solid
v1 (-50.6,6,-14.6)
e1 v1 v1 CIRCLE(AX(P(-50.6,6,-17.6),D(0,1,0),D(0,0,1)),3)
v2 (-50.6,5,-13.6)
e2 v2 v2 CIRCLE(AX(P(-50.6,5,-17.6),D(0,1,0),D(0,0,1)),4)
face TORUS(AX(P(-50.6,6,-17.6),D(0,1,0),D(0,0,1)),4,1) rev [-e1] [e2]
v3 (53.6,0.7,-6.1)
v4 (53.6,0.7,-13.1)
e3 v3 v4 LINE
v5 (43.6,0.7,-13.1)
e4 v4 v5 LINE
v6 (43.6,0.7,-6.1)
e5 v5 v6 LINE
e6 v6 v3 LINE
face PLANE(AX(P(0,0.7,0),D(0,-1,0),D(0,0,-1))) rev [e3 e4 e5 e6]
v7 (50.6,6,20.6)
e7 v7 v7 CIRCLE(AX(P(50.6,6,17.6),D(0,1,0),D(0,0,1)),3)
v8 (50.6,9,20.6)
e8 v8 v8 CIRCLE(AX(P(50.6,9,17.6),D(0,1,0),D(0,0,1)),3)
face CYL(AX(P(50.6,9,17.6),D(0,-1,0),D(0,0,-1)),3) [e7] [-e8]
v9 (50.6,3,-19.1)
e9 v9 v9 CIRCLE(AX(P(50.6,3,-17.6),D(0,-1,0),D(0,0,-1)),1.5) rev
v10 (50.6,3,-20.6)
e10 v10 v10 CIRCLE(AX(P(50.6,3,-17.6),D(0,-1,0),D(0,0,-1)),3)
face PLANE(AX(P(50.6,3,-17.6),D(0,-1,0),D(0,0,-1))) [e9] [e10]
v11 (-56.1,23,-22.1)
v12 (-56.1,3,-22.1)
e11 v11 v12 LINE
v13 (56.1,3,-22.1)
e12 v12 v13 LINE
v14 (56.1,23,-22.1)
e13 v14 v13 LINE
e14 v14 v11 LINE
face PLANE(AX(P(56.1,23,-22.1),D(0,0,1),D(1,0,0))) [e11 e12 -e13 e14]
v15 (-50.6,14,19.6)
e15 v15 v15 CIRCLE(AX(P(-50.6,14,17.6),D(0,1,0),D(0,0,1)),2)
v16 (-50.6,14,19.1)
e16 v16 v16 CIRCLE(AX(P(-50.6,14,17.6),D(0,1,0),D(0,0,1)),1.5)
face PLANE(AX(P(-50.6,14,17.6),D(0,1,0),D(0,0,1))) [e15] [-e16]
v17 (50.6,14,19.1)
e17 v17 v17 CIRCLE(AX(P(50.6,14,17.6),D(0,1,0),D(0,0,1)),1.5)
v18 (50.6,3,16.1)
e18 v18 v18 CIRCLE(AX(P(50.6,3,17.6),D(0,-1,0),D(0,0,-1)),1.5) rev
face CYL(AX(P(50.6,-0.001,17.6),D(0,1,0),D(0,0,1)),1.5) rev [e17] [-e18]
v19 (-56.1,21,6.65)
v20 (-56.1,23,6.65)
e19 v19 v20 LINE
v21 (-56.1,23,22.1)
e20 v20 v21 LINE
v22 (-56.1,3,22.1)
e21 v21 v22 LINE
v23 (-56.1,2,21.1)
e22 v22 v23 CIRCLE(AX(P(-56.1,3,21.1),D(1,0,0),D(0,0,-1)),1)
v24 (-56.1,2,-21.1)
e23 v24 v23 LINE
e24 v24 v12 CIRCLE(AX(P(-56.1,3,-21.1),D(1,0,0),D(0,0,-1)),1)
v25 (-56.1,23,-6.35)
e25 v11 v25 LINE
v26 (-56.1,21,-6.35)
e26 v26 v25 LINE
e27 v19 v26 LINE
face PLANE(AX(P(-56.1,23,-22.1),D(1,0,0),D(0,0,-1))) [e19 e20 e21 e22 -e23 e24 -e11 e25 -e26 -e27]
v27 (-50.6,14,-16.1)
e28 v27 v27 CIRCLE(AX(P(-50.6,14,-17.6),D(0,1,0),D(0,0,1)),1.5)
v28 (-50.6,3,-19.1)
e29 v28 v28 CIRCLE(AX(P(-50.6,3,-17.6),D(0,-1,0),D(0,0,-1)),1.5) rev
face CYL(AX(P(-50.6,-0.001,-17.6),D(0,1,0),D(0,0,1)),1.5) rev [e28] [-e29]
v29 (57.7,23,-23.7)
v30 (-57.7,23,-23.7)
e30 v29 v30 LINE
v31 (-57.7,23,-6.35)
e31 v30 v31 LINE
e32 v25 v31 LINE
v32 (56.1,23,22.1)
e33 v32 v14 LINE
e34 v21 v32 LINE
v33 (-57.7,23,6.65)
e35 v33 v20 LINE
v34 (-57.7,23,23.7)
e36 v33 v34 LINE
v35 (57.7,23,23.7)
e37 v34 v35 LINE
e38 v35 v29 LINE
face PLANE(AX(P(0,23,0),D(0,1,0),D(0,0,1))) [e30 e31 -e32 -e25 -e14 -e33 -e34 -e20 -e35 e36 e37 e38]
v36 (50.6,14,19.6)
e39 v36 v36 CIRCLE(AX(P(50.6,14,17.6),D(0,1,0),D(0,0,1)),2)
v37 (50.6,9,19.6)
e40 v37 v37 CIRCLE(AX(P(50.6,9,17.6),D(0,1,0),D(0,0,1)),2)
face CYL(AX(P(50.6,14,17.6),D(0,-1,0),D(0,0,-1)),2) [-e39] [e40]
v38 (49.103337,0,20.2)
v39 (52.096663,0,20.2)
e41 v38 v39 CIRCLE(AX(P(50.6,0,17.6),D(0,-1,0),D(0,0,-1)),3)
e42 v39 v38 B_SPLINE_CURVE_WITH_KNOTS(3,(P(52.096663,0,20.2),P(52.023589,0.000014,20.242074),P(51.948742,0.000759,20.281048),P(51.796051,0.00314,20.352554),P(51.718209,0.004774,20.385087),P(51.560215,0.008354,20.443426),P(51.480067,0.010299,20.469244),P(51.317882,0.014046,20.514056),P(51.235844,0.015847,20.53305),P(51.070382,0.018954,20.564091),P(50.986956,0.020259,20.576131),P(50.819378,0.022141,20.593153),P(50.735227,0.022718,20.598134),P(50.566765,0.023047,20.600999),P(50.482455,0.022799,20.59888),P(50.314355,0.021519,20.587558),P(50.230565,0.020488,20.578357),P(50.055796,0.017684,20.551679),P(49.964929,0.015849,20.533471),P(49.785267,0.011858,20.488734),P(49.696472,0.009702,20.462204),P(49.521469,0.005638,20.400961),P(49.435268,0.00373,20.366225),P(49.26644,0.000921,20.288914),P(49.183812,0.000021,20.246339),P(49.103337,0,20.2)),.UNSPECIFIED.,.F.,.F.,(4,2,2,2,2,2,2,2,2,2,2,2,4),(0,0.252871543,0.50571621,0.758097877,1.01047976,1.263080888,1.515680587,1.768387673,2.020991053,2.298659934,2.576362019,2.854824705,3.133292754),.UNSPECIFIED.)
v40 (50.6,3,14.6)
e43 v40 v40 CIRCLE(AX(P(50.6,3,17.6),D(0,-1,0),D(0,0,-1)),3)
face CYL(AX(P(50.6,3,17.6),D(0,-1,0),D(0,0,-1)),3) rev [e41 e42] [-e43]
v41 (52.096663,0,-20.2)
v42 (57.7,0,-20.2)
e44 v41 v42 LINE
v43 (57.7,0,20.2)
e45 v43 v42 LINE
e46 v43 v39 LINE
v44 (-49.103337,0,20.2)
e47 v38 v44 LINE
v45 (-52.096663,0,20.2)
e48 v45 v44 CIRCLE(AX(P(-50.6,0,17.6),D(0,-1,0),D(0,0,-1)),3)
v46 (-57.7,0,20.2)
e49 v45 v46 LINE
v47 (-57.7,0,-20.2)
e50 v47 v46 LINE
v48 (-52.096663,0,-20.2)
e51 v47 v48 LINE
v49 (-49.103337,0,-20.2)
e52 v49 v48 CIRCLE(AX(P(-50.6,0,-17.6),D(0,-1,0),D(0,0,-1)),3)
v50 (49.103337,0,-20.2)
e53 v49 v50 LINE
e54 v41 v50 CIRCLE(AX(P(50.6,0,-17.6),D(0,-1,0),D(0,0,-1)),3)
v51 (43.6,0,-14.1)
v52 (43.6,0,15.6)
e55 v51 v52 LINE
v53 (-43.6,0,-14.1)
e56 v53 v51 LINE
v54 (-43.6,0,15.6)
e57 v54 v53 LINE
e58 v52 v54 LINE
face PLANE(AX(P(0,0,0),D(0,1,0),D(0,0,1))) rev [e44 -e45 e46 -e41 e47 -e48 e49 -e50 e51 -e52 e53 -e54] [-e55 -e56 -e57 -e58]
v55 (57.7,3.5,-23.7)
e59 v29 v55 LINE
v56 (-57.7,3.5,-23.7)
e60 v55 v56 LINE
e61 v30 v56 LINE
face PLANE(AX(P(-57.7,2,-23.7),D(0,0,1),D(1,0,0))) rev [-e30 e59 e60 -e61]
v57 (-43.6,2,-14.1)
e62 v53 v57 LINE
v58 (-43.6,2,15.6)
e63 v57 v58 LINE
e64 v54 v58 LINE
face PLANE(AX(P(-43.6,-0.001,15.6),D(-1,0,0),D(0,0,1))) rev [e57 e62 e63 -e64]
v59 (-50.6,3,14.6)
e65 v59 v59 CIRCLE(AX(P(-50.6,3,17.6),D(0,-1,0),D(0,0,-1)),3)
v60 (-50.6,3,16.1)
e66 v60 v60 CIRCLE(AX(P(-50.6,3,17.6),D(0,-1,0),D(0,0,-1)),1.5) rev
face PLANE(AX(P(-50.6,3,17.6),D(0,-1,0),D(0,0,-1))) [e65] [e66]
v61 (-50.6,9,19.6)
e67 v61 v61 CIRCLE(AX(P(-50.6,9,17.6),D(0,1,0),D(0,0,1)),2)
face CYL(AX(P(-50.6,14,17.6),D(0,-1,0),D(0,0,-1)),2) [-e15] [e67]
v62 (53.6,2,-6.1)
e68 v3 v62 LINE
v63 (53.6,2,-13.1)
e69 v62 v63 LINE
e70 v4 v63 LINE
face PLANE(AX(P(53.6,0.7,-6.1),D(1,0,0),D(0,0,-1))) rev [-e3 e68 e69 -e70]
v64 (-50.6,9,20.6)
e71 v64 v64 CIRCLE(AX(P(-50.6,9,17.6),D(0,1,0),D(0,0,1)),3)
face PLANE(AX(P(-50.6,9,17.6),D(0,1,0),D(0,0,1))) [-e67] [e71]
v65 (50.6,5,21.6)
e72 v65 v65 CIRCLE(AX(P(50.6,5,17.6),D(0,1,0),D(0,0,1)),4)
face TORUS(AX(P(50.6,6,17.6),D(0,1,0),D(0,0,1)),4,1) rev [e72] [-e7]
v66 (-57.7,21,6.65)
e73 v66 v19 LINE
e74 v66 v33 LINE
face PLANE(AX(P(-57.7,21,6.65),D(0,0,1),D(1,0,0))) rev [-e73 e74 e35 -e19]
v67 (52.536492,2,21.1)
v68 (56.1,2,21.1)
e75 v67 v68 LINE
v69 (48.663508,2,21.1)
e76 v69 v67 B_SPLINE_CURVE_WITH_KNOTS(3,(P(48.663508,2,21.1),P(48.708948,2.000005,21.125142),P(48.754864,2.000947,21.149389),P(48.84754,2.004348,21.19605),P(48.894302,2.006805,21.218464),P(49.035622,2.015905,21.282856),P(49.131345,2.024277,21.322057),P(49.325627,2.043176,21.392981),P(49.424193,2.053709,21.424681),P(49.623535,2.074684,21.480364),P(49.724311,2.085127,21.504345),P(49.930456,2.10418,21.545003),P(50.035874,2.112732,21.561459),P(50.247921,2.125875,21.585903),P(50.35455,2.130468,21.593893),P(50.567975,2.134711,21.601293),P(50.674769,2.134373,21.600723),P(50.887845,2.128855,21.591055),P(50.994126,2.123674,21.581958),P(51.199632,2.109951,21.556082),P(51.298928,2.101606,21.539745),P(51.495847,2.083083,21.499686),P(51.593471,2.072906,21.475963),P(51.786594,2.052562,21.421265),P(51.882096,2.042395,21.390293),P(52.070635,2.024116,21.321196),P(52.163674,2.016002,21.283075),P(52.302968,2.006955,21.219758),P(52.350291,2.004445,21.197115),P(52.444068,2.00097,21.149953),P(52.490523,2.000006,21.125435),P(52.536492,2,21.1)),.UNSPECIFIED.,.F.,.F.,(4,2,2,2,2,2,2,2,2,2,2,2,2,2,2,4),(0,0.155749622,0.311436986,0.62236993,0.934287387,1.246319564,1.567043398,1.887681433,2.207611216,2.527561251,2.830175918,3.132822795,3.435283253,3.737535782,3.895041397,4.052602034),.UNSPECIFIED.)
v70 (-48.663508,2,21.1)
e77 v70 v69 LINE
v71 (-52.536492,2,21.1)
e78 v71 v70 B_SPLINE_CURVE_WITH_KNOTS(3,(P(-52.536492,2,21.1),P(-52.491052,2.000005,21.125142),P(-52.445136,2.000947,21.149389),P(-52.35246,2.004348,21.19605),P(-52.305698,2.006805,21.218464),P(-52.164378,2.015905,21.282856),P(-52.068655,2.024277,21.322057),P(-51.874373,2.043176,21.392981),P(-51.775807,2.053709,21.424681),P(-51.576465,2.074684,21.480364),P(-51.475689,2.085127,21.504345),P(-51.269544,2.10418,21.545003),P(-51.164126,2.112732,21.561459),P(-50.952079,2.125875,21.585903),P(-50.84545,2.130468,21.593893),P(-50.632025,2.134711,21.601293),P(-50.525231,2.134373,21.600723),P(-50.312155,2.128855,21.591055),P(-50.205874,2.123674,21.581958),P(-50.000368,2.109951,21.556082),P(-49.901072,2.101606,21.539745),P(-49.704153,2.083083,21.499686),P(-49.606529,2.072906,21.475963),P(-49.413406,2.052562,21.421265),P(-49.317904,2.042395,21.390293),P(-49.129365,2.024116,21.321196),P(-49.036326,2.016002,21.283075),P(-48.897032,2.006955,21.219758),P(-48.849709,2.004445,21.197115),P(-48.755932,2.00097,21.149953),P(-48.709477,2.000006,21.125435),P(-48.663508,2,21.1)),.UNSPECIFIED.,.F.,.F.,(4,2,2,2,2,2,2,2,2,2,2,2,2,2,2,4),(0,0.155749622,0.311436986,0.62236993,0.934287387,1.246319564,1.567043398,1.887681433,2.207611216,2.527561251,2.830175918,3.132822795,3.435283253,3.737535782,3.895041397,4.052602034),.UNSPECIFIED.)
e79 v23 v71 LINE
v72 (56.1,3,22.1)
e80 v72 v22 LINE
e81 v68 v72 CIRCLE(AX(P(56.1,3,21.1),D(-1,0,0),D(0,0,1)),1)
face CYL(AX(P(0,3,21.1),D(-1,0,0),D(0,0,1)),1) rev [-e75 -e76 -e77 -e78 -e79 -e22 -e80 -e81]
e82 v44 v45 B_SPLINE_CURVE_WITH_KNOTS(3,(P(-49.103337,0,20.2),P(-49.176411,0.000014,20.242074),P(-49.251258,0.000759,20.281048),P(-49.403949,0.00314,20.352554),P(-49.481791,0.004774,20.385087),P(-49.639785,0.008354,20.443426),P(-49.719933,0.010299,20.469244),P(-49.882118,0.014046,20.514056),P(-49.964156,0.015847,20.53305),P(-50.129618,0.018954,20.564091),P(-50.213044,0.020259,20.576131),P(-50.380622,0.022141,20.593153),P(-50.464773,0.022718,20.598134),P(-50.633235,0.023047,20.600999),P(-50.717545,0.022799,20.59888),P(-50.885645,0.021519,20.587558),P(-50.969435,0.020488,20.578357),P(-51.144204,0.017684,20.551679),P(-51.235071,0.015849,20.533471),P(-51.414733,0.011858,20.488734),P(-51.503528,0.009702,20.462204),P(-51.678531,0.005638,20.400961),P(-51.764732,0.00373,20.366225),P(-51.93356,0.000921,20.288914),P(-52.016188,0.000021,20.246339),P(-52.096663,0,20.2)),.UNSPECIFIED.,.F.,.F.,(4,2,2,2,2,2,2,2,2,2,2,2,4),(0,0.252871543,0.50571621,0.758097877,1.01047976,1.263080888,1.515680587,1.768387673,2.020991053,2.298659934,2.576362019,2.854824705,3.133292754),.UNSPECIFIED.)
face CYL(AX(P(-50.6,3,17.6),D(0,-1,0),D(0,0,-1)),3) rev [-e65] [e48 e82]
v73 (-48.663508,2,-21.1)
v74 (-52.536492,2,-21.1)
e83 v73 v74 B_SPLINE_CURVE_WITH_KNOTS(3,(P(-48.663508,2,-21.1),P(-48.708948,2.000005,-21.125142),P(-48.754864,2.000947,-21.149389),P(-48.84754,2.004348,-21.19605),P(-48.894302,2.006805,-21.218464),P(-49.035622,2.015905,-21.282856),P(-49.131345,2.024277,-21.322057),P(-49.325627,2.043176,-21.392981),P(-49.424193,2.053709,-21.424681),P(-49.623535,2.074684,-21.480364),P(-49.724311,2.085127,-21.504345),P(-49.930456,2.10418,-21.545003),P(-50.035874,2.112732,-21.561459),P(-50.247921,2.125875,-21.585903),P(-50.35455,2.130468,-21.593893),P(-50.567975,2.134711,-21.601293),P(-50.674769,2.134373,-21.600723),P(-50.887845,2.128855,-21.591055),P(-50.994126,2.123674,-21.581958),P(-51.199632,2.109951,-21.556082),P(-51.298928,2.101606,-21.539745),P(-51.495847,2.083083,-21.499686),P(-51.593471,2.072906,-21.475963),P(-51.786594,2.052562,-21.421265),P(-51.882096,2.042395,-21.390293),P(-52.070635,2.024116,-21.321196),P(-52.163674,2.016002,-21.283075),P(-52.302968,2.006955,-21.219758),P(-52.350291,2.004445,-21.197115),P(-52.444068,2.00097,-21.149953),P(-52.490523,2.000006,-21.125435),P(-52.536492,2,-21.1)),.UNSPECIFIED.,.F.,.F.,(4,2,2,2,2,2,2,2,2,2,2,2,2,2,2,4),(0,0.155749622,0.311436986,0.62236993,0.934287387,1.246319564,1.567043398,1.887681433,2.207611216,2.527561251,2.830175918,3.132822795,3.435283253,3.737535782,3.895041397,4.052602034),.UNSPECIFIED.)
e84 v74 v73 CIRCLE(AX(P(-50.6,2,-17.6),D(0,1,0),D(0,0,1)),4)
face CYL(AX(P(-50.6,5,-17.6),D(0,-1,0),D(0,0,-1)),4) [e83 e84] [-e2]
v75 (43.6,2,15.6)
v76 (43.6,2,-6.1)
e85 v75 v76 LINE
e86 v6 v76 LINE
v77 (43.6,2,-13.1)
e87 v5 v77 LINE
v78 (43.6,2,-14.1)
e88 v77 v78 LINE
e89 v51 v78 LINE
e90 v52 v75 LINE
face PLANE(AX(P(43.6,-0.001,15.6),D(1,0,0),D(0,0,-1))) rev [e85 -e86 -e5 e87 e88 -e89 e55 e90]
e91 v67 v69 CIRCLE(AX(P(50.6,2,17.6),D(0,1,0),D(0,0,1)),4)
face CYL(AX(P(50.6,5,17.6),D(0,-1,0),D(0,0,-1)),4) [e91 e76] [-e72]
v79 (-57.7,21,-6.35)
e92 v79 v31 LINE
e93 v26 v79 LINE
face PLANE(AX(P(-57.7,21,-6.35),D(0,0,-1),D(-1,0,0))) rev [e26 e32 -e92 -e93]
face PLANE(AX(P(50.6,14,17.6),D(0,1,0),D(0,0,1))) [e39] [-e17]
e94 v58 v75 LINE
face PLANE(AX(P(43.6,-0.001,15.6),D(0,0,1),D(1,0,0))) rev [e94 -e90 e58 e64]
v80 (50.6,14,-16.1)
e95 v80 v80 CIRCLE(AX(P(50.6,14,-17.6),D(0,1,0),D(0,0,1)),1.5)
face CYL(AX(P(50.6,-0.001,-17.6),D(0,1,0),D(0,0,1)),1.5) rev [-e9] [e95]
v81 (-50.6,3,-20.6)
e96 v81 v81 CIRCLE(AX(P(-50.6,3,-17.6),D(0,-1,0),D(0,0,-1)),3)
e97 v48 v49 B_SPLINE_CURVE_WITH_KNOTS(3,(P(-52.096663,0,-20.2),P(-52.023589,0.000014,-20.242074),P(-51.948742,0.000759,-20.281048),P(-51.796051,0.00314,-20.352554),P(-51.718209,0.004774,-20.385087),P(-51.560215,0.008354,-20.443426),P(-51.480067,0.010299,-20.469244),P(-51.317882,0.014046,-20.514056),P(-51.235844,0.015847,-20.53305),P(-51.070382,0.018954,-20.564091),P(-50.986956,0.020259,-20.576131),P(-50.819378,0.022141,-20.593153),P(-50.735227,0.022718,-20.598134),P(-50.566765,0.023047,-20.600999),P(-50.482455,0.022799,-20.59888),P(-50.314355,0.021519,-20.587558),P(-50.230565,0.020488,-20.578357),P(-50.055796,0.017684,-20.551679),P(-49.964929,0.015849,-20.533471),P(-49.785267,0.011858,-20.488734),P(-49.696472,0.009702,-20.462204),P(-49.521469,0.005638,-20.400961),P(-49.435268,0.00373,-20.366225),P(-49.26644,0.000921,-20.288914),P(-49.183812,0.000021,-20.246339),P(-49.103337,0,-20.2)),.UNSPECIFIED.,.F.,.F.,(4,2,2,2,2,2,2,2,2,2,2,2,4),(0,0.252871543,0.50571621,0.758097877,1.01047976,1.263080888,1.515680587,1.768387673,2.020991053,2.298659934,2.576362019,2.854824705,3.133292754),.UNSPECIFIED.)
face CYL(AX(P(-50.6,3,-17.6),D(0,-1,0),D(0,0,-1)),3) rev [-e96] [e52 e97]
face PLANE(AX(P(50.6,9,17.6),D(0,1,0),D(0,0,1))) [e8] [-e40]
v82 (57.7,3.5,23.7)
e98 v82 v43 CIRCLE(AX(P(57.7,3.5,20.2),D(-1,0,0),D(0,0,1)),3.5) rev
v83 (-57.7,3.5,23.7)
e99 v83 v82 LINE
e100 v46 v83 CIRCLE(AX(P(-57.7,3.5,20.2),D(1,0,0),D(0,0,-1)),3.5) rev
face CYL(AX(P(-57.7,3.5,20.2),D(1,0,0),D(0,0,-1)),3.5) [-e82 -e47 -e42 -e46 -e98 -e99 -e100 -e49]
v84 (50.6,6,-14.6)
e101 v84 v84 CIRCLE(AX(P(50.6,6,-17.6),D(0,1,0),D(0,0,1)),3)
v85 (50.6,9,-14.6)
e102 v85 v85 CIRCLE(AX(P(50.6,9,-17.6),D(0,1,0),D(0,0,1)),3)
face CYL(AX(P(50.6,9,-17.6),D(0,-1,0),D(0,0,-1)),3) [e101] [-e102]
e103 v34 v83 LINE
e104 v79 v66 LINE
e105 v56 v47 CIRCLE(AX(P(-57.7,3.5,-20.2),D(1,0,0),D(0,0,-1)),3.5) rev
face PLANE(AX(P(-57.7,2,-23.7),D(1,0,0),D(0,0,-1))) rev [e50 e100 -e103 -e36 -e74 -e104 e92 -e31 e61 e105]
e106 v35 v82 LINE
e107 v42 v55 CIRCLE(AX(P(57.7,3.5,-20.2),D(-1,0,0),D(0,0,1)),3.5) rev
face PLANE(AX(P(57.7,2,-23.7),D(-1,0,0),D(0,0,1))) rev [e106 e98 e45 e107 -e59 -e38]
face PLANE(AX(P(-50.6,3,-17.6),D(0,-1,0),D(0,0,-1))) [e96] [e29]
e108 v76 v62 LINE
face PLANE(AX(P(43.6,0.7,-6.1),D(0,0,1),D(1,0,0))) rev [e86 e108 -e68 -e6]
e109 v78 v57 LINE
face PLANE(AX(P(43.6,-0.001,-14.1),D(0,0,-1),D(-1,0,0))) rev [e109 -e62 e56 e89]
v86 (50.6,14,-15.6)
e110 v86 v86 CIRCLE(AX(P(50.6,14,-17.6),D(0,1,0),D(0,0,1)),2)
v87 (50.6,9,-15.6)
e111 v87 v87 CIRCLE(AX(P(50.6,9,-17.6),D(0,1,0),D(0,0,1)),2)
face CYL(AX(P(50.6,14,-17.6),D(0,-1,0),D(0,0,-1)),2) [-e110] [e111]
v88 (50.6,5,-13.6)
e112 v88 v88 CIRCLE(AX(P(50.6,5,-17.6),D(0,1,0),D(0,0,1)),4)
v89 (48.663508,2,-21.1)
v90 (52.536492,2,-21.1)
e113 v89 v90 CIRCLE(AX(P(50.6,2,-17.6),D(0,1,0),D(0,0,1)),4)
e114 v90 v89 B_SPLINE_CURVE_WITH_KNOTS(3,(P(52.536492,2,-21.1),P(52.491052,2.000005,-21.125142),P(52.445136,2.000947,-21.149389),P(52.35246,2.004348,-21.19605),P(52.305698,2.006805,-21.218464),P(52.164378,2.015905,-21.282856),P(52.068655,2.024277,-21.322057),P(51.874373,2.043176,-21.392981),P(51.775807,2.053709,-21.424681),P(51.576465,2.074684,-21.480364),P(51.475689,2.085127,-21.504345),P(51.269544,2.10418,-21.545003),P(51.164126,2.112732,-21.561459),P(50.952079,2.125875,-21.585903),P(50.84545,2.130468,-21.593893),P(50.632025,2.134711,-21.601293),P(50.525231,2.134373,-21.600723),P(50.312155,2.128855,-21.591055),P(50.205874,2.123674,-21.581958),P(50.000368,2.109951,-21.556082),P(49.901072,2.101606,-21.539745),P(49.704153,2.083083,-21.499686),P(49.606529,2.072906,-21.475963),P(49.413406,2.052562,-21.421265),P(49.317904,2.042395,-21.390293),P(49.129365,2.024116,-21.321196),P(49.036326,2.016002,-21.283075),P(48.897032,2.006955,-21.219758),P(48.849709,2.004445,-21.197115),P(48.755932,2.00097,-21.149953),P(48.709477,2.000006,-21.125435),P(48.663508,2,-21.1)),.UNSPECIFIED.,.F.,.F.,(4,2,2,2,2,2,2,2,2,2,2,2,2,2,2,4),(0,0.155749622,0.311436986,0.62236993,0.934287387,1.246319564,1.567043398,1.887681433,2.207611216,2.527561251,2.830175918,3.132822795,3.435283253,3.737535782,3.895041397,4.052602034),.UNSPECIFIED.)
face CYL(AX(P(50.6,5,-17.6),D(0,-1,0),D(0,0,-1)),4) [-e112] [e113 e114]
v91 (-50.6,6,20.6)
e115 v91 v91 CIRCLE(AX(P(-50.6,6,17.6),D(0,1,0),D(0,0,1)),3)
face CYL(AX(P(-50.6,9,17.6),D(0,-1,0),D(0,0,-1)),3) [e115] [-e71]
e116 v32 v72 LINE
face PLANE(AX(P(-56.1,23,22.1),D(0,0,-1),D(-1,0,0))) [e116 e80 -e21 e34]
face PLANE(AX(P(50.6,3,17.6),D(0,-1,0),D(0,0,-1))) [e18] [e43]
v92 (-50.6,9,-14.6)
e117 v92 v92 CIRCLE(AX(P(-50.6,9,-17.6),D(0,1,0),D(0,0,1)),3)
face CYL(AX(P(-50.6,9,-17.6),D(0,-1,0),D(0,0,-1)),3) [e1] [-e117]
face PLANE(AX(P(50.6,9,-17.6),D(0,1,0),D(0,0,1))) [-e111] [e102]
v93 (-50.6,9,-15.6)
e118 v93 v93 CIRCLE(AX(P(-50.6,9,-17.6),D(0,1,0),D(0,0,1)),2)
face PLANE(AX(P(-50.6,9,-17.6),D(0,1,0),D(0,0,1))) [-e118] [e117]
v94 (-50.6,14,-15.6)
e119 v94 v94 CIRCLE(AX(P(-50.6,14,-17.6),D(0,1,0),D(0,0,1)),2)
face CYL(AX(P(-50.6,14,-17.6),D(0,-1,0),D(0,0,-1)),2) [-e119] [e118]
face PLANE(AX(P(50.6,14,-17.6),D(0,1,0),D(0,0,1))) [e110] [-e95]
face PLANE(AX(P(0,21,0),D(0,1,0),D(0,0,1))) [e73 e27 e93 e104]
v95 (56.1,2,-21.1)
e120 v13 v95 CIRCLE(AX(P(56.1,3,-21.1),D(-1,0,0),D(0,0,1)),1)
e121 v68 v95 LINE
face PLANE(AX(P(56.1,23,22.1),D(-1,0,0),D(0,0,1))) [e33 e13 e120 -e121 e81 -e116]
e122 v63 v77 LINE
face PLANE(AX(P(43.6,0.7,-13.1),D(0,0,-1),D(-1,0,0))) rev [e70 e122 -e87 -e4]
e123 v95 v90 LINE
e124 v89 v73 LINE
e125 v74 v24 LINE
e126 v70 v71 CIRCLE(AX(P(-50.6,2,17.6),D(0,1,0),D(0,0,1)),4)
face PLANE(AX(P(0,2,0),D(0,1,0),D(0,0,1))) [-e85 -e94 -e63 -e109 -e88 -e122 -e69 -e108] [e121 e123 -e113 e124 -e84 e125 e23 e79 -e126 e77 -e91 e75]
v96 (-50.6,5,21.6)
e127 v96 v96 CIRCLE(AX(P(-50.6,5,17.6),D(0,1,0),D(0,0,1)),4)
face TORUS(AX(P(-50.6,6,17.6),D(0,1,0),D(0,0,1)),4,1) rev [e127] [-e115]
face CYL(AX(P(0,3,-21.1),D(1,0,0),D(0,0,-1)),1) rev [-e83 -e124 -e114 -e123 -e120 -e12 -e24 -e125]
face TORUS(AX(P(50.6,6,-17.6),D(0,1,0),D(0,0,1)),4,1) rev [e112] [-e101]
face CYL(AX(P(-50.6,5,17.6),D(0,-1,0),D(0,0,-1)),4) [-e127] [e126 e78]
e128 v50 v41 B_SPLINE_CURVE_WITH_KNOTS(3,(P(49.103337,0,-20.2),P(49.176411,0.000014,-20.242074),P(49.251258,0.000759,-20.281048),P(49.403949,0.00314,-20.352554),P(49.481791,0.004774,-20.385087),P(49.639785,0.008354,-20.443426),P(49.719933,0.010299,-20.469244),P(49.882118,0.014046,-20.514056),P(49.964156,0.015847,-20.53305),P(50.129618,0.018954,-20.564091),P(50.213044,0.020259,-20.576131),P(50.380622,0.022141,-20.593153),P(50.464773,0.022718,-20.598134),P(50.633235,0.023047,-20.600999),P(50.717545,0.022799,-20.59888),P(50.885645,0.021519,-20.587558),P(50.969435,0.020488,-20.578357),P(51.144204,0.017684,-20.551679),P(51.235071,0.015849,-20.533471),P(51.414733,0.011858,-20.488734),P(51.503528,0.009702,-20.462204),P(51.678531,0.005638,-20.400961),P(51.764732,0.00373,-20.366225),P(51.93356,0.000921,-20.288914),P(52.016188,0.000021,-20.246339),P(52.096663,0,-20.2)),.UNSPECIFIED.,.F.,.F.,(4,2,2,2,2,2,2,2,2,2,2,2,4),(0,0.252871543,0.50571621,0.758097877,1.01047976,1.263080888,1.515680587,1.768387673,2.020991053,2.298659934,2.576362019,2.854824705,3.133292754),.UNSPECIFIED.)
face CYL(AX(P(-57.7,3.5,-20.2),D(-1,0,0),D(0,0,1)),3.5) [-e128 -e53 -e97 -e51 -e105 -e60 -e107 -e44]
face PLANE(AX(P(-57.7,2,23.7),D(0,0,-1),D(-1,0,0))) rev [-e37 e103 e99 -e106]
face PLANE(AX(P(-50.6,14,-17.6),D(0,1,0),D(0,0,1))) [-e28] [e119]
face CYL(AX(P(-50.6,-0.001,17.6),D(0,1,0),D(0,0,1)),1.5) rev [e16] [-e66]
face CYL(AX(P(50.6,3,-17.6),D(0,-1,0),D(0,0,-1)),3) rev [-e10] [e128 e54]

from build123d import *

# Parameters (mm, degrees)
SKETCH_1_W          = 115.4
SKETCH_1_H          = 47.4
EXTRUDE_1_DEPTH     = 2
SKETCH_2_W          = 115.4
SKETCH_2_H          = 47.4
SKETCH_2_W_2        = 112.2
SKETCH_2_H_2        = 44.2
EXTRUDE_2_DEPTH     = 21
CUT_EXTRUDE_1_REACH = 67.818
SKETCH_3_W          = 87.2
SKETCH_3_H          = 29.7
SKETCH_4_W          = 10
SKETCH_4_H          = 7
CUT_EXTRUDE_2_DEPTH = 1.3
SKETCH_5_R          = 3
EXTRUDE_3_DEPTH     = 7
SKETCH_6_R          = 2
EXTRUDE_4_DEPTH     = 5
CUT_EXTRUDE_3_REACH = 65.929
SKETCH_7_R          = 1.5
SKETCH_8_R          = 4
EXTRUDE_8_DEPTH     = 3
FILLET_1_R          = 1
SKETCH_9_R          = 3
CUT_EXTRUDE_4_DEPTH = 3
CUT_EXTRUDE_5_REACH = 66.923
SKETCH_10_R         = 1.5
SKETCH_11_W         = 1.6
SKETCH_11_H         = 13
CUT_EXTRUDE_6_DEPTH = 2
FILLET_2_R          = 3.5
FILLET_3_R          = 1


# Some blends are built 0.0001 mm under size
with BuildPart() as part:
    # 草图1 → 凸台-拉伸1 (new body)
    with BuildSketch(Plane(origin=(0, 0, 0), x_dir=(1, 0, 0), z_dir=(0, 1, 0))):
        Rectangle(SKETCH_1_W, SKETCH_1_H)
    extrude(amount=EXTRUDE_1_DEPTH)

    # 草图2 → 凸台-拉伸2 (add)
    with BuildSketch(Plane(origin=(0, 2, 0), x_dir=(1, 0, 0), z_dir=(0, 1, 0))):
        Rectangle(SKETCH_2_W, SKETCH_2_H)
        Rectangle(SKETCH_2_W_2, SKETCH_2_H_2, mode=Mode.SUBTRACT)
    extrude(amount=EXTRUDE_2_DEPTH)

    # 草图3 → 切除-拉伸1 (cut, up to next)
    with BuildSketch(Plane(origin=(0, 2, 0), x_dir=(1, 0, 0), z_dir=(0, 1, 0)), mode=Mode.PRIVATE) as cut_extrude_1_sk1:
        with Locations((0, -0.75)):
            Rectangle(SKETCH_3_W, SKETCH_3_H)
    cut_extrude_1_tool1 = extrude(cut_extrude_1_sk1.sketch, amount=-CUT_EXTRUDE_1_REACH, mode=Mode.PRIVATE) & part.part
    add(cut_extrude_1_tool1.solids().sort_by_distance((0, 2, 0.75))[0], mode=Mode.SUBTRACT)

    # 草图4 → 切除-拉伸2 (cut)
    with BuildSketch(Plane(origin=(0, 2, 0), x_dir=(1, 0, 0), z_dir=(0, 1, 0))):
        with Locations((48.6, 9.6)):
            Rectangle(SKETCH_4_W, SKETCH_4_H)
    extrude(amount=-CUT_EXTRUDE_2_DEPTH, mode=Mode.SUBTRACT)

    # 草图5 → 凸台-拉伸3 (add)
    with BuildSketch(Plane(origin=(0, 2, 0), x_dir=(1, 0, 0), z_dir=(0, 1, 0))):
        with Locations(Location((50.6, -17.6, 0), (0, 0, 270))):
            Circle(SKETCH_5_R)
        with Locations(Location((50.6, 17.6, 0), (0, 0, 270))):
            Circle(SKETCH_5_R)
        with Locations(Location((-50.6, -17.6, 0), (0, 0, 270))):
            Circle(SKETCH_5_R)
        with Locations(Location((-50.6, 17.6, 0), (0, 0, 270))):
            Circle(SKETCH_5_R)
    extrude(amount=EXTRUDE_3_DEPTH)

    # 草图6 → 凸台-拉伸4 (add)
    with BuildSketch(Plane(origin=(0, 9, 0), x_dir=(1, 0, 0), z_dir=(0, 1, 0))):
        with Locations(Location((50.6, -17.6, 0), (0, 0, 270))):
            Circle(SKETCH_6_R)
        with Locations(Location((50.6, 17.6, 0), (0, 0, 270))):
            Circle(SKETCH_6_R)
        with Locations(Location((-50.6, -17.6, 0), (0, 0, 270))):
            Circle(SKETCH_6_R)
        with Locations(Location((-50.6, 17.6, 0), (0, 0, 270))):
            Circle(SKETCH_6_R)
    extrude(amount=EXTRUDE_4_DEPTH)

    # 草图7 → 切除-拉伸3 (cut, up to next)
    with BuildSketch(Plane(origin=(0, 14, 0), x_dir=(1, 0, 0), z_dir=(0, 1, 0)), mode=Mode.PRIVATE) as cut_extrude_3_sk1:
        with Locations(Location((50.6, -17.6, 0), (0, 0, 270))):
            Circle(SKETCH_7_R)
    cut_extrude_3_tool1 = extrude(cut_extrude_3_sk1.sketch, amount=-CUT_EXTRUDE_3_REACH, mode=Mode.PRIVATE) & part.part
    # 草图7 → 切除-拉伸3 (cut, up to next)
    with BuildSketch(Plane(origin=(0, 14, 0), x_dir=(1, 0, 0), z_dir=(0, 1, 0)), mode=Mode.PRIVATE) as cut_extrude_3_sk2:
        with Locations(Location((-50.6, -17.6, 0), (0, 0, 270))):
            Circle(SKETCH_7_R)
    cut_extrude_3_tool2 = extrude(cut_extrude_3_sk2.sketch, amount=-CUT_EXTRUDE_3_REACH, mode=Mode.PRIVATE) & part.part
    # 草图7 → 切除-拉伸3 (cut, up to next)
    with BuildSketch(Plane(origin=(0, 14, 0), x_dir=(1, 0, 0), z_dir=(0, 1, 0)), mode=Mode.PRIVATE) as cut_extrude_3_sk3:
        with Locations(Location((50.6, 17.6, 0), (0, 0, 270))):
            Circle(SKETCH_7_R)
    cut_extrude_3_tool3 = extrude(cut_extrude_3_sk3.sketch, amount=-CUT_EXTRUDE_3_REACH, mode=Mode.PRIVATE) & part.part
    # 草图7 → 切除-拉伸3 (cut, up to next)
    with BuildSketch(Plane(origin=(0, 14, 0), x_dir=(1, 0, 0), z_dir=(0, 1, 0)), mode=Mode.PRIVATE) as cut_extrude_3_sk4:
        with Locations(Location((-50.6, 17.6, 0), (0, 0, 270))):
            Circle(SKETCH_7_R)
    cut_extrude_3_tool4 = extrude(cut_extrude_3_sk4.sketch, amount=-CUT_EXTRUDE_3_REACH, mode=Mode.PRIVATE) & part.part
    add(cut_extrude_3_tool1.solids().sort_by_distance((50.6, 14, 17.6))[0], mode=Mode.SUBTRACT)
    add(cut_extrude_3_tool2.solids().sort_by_distance((-50.6, 14, 17.6))[0], mode=Mode.SUBTRACT)
    add(cut_extrude_3_tool3.solids().sort_by_distance((50.6, 14, -17.6))[0], mode=Mode.SUBTRACT)
    add(cut_extrude_3_tool4.solids().sort_by_distance((-50.6, 14, -17.6))[0], mode=Mode.SUBTRACT)

    # 草图8 → 凸台-拉伸8 (add)
    with BuildSketch(Plane(origin=(0, 2, 0), x_dir=(1, 0, 0), z_dir=(0, 1, 0))):
        with Locations(Location((50.6, -17.6, 0), (0, 0, 270))):
            Circle(SKETCH_8_R)
        with Locations(Location((50.6, 17.6, 0), (0, 0, 270))):
            Circle(SKETCH_8_R)
        with Locations(Location((-50.6, -17.6, 0), (0, 0, 270))):
            Circle(SKETCH_8_R)
        with Locations(Location((-50.6, 17.6, 0), (0, 0, 270))):
            Circle(SKETCH_8_R)
    extrude(amount=EXTRUDE_8_DEPTH)

    # 圆角1
    fillet_1_edges = [part.edges().sort_by_distance(p)[0] for p in [
        (50.6, 5, 14.6),
        (50.6, 5, -20.6),
        (-50.6, 5, 14.6),
        (-50.6, 5, -20.6),
    ]]
    fillet(fillet_1_edges, radius=FILLET_1_R - 0.0001)  # a hair under: the kernel refuses the full size

    # 草图9 → 切除-拉伸4 (cut)
    with BuildSketch(Plane.XZ):
        with Locations(Location((-50.6, 17.6, 0), (0, 0, 90))):
            Circle(SKETCH_9_R)
        with Locations(Location((50.6, 17.6, 0), (0, 0, 90))):
            Circle(SKETCH_9_R)
        with Locations(Location((50.6, -17.6, 0), (0, 0, 90))):
            Circle(SKETCH_9_R)
        with Locations(Location((-50.6, -17.6, 0), (0, 0, 90))):
            Circle(SKETCH_9_R)
    extrude(amount=-CUT_EXTRUDE_4_DEPTH, mode=Mode.SUBTRACT)

    # 草图10 → 切除-拉伸5 (cut, up to next)
    with BuildSketch(Plane(origin=(0, 5, 0), x_dir=(1, 0, 0), z_dir=(0, 1, 0)), mode=Mode.PRIVATE) as cut_extrude_5_sk1:
        with Locations(Location((50.6, -17.6, 0), (0, 0, 270))):
            Circle(SKETCH_10_R)
    cut_extrude_5_tool1 = extrude(cut_extrude_5_sk1.sketch, amount=-CUT_EXTRUDE_5_REACH, mode=Mode.PRIVATE) & part.part
    # 草图10 → 切除-拉伸5 (cut, up to next)
    with BuildSketch(Plane(origin=(0, 5, 0), x_dir=(1, 0, 0), z_dir=(0, 1, 0)), mode=Mode.PRIVATE) as cut_extrude_5_sk2:
        with Locations(Location((50.6, 17.6, 0), (0, 0, 270))):
            Circle(SKETCH_10_R)
    cut_extrude_5_tool2 = extrude(cut_extrude_5_sk2.sketch, amount=-CUT_EXTRUDE_5_REACH, mode=Mode.PRIVATE) & part.part
    # 草图10 → 切除-拉伸5 (cut, up to next)
    with BuildSketch(Plane(origin=(0, 5, 0), x_dir=(1, 0, 0), z_dir=(0, 1, 0)), mode=Mode.PRIVATE) as cut_extrude_5_sk3:
        with Locations(Location((-50.6, 17.6, 0), (0, 0, 270))):
            Circle(SKETCH_10_R)
    cut_extrude_5_tool3 = extrude(cut_extrude_5_sk3.sketch, amount=-CUT_EXTRUDE_5_REACH, mode=Mode.PRIVATE) & part.part
    # 草图10 → 切除-拉伸5 (cut, up to next)
    with BuildSketch(Plane(origin=(0, 5, 0), x_dir=(1, 0, 0), z_dir=(0, 1, 0)), mode=Mode.PRIVATE) as cut_extrude_5_sk4:
        with Locations(Location((-50.6, -17.6, 0), (0, 0, 270))):
            Circle(SKETCH_10_R)
    cut_extrude_5_tool4 = extrude(cut_extrude_5_sk4.sketch, amount=-CUT_EXTRUDE_5_REACH, mode=Mode.PRIVATE) & part.part
    add(cut_extrude_5_tool1.solids().sort_by_distance((50.6, 5, 17.6))[0], mode=Mode.SUBTRACT)
    add(cut_extrude_5_tool2.solids().sort_by_distance((50.6, 5, -17.6))[0], mode=Mode.SUBTRACT)
    add(cut_extrude_5_tool3.solids().sort_by_distance((-50.6, 5, -17.6))[0], mode=Mode.SUBTRACT)
    add(cut_extrude_5_tool4.solids().sort_by_distance((-50.6, 5, 17.6))[0], mode=Mode.SUBTRACT)

    # 草图11 → 切除-拉伸6 (cut)
    with BuildSketch(Plane(origin=(0, 23, 0), x_dir=(1, 0, 0), z_dir=(0, 1, 0))):
        with Locations((-56.9, -0.15)):
            Rectangle(SKETCH_11_W, SKETCH_11_H)
    extrude(amount=-CUT_EXTRUDE_6_DEPTH, mode=Mode.SUBTRACT)

    # 圆角2
    # the kernel refuses this fillet: 3.5 mm, written as the material it takes off along each edge
    with BuildSketch(Plane(origin=(66.45, 0, 23.7), x_dir=(0, 0, -1), z_dir=(-1, 0, 0)), Plane(origin=(-66.45, 0, -23.7), x_dir=(0, 0, 1), z_dir=(1, 0, 0))) as fillet_2_piece_1:
        with BuildLine():
            CenterArc((FILLET_2_R, -FILLET_2_R), FILLET_2_R, 90, 90)
            Line((0, -FILLET_2_R), (0, 0))
            Line((0, 0), (FILLET_2_R, 0))
        make_face()
    extrude(amount=132.9, mode=Mode.SUBTRACT)

    # 圆角3
    # the kernel refuses this fillet: 1 mm, written as the material it adds along each edge
    with BuildSketch(Plane(origin=(-58.6, 2, 22.1), x_dir=(0, 0, -1), z_dir=(1, 0, 0))) as fillet_3_piece_1_section:
        with BuildLine():
            CenterArc((FILLET_3_R, FILLET_3_R), FILLET_3_R, 180, 90)
            Line((0, FILLET_3_R), (0, 0))
            Line((0, 0), (FILLET_3_R, 0))
        make_face()
    fillet_3_piece_1 = extrude(amount=117.2, mode=Mode.PRIVATE)
    fillet_3_piece_1 = split(fillet_3_piece_1, bisect_by=Plane(origin=(-57.7, 2.223988989, 21.878062935), z_dir=(1, 0, 0)), keep=Keep.TOP, mode=Mode.PRIVATE)
    fillet_3_piece_1 = split(fillet_3_piece_1, bisect_by=Plane(origin=(57.7, 2.223988989, 21.878062935), z_dir=(-1, 0, 0)), keep=Keep.TOP, mode=Mode.PRIVATE)
    add(fillet_3_piece_1)
    with BuildSketch(Plane(origin=(58.6, 2, -22.1), x_dir=(0, 0, 1), z_dir=(-1, 0, 0))) as fillet_3_piece_2_section:
        with BuildLine():
            CenterArc((FILLET_3_R, FILLET_3_R), FILLET_3_R, 180, 90)
            Line((0, FILLET_3_R), (0, 0))
            Line((0, 0), (FILLET_3_R, 0))
        make_face()
    fillet_3_piece_2 = extrude(amount=117.2, mode=Mode.PRIVATE)
    fillet_3_piece_2 = split(fillet_3_piece_2, bisect_by=Plane(origin=(-57.7, 2.223988985, -21.878062921), z_dir=(1, 0, 0)), keep=Keep.TOP, mode=Mode.PRIVATE)
    fillet_3_piece_2 = split(fillet_3_piece_2, bisect_by=Plane(origin=(57.7, 2.223988985, -21.878062921), z_dir=(-1, 0, 0)), keep=Keep.TOP, mode=Mode.PRIVATE)
    add(fillet_3_piece_2)


solid = part.part
